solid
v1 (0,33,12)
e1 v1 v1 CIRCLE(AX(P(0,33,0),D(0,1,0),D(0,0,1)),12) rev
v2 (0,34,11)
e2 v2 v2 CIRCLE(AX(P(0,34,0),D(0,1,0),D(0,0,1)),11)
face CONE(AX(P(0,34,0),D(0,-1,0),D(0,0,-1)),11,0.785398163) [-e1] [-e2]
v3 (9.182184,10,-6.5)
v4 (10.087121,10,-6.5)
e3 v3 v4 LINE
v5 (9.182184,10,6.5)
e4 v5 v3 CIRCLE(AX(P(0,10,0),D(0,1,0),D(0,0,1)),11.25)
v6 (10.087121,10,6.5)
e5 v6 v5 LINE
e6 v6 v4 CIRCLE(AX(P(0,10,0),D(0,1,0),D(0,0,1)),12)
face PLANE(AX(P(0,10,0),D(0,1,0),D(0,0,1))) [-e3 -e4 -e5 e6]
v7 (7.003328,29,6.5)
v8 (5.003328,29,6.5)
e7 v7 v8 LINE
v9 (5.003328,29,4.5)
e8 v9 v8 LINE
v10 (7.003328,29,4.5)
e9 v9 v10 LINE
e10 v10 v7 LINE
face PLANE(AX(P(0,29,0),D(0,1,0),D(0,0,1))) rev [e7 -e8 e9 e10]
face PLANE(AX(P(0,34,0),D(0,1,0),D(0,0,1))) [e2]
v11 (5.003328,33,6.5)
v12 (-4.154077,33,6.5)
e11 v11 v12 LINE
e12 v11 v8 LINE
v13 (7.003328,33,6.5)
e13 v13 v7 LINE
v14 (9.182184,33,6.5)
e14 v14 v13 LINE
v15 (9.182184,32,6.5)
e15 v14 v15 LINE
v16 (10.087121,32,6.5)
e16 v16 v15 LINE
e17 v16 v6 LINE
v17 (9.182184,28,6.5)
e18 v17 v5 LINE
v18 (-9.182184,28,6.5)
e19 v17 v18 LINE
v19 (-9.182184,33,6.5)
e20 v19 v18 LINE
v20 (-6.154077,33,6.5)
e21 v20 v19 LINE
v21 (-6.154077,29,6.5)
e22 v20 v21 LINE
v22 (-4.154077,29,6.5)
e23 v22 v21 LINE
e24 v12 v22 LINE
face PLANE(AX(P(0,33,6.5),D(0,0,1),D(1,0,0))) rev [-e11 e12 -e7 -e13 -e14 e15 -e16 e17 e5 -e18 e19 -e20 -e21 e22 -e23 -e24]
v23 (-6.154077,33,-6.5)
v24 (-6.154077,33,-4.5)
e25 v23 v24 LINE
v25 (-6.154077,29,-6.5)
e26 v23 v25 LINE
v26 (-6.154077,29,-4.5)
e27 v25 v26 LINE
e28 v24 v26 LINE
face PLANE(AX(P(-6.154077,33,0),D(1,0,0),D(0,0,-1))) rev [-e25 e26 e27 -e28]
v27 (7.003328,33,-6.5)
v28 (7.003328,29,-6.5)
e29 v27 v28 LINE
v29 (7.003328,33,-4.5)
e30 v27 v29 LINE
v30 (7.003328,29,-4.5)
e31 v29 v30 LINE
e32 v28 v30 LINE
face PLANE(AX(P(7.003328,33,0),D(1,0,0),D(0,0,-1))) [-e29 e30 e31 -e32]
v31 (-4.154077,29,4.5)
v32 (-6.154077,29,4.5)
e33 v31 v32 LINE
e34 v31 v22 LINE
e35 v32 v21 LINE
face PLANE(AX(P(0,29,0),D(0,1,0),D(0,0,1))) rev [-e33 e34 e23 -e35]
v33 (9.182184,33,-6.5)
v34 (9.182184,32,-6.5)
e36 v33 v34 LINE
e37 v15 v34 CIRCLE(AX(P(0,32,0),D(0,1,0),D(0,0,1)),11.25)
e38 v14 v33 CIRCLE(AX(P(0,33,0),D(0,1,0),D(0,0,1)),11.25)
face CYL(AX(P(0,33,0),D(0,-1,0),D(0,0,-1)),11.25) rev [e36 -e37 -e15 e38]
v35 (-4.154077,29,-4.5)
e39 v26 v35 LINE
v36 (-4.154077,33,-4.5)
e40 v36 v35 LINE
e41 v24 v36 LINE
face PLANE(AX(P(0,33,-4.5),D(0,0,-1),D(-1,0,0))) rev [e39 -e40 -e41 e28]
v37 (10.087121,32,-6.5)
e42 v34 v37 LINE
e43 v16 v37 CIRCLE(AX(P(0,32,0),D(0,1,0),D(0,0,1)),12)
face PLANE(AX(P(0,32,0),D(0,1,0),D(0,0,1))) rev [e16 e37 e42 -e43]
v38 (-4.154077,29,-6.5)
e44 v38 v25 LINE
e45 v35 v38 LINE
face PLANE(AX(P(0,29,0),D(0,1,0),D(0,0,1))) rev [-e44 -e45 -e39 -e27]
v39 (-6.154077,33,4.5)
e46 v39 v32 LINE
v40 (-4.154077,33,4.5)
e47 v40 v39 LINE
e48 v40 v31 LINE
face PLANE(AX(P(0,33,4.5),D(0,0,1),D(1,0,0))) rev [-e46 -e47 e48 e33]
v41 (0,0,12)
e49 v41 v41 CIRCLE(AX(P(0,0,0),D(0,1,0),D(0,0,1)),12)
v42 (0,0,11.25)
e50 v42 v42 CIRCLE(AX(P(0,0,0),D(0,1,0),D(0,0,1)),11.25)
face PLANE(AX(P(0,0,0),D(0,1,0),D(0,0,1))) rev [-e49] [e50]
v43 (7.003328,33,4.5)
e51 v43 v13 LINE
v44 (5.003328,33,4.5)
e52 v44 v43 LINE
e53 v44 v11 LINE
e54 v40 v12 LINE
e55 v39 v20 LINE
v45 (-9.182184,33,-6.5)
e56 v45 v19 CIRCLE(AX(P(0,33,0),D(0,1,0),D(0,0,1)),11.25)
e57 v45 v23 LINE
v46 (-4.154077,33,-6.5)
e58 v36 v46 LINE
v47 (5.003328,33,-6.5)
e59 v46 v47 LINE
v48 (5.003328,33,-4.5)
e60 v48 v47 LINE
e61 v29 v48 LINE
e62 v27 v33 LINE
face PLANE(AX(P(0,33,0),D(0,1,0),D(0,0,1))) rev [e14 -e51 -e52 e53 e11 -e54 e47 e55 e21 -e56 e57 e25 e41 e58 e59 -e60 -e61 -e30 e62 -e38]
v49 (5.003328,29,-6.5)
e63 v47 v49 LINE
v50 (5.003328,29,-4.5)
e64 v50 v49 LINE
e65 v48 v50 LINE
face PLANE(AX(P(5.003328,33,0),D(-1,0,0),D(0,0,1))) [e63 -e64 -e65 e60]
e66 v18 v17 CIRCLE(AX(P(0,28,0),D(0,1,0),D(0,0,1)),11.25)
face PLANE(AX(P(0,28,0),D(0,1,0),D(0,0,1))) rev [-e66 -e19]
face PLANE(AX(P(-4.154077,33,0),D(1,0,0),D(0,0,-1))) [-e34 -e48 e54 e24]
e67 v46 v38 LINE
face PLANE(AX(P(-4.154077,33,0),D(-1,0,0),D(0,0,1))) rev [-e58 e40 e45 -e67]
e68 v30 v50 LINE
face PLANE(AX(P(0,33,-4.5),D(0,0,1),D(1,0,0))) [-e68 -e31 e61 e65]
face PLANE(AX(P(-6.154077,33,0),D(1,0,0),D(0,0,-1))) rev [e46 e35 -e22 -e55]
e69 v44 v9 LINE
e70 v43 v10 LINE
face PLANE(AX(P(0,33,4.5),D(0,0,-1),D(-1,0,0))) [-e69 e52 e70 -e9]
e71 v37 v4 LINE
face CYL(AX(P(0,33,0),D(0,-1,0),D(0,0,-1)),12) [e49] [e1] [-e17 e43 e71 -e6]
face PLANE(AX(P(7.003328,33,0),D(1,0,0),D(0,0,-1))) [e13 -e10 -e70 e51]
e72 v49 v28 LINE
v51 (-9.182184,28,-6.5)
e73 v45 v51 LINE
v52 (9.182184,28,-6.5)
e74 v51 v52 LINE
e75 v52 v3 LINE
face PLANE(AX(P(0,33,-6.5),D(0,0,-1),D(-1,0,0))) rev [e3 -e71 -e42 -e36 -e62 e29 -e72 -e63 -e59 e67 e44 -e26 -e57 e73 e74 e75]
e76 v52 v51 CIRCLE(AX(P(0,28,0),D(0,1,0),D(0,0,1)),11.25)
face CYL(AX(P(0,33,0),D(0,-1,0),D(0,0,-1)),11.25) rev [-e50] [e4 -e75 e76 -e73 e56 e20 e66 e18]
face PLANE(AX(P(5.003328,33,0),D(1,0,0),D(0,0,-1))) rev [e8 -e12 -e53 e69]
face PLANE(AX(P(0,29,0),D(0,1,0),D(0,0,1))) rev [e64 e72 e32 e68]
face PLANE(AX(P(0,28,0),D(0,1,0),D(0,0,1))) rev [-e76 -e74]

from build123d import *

# Parameters (mm, degrees)
BOSS_EXTRUDE1_DEPTH = 33
BOSS_EXTRUDE2_START = 32
BOSS_EXTRUDE2_DEPTH = 1
BOSS_EXTRUDE3_START = 33
SKETCH1_7_R         = 12
BOSS_EXTRUDE3_DEPTH = 1
CHAMFER1_SIZE       = 1
BOSS_EXTRUDE4_DEPTH = 10
BOSS_EXTRUDE5_START = 29
SKETCH1_9_W         = 2
SKETCH1_9_H         = 2
BOSS_EXTRUDE5_DEPTH = 4
BOSS_EXTRUDE6_START = 28
BOSS_EXTRUDE6_DEPTH = 5


with BuildPart() as part:
    # Sketch1 → Boss-Extrude1 (new body)
    with BuildSketch(Plane(origin=(0, 0, 0), x_dir=(1, 0, 0), z_dir=(0, 1, 0))):
        with BuildLine():
            ThreePointArc((7.383924434, -9.459263182), (8.859947089, -8.093289663), (10.087120501, -6.5))
            Line((10.087120501, -6.5), (9.182183836, -6.5))
            ThreePointArc((9.182183836, -6.5), (0, -11.25), (-9.182183836, -6.5))
            ThreePointArc((-9.182183836, -6.5), (-11.25, 0), (-9.182183836, 6.5))
            ThreePointArc((-9.182183836, 6.5), (0, 11.25), (9.182183836, 6.5))
            Line((9.182183836, 6.5), (10.087120501, 6.5))
            ThreePointArc((10.087120501, 6.5), (7.6512779, 9.244346732), (4.5, 11.124297731))
            ThreePointArc((4.5, 11.124297731), (0, 12), (-4.5, 11.124297731))
            ThreePointArc((-4.5, 11.124297731), (-10.392304845, 6), (-11.883924434, -1.665034548))
            ThreePointArc((-11.883924434, -1.665034548), (-10.392304845, -6), (-7.383924434, -9.459263182))
            ThreePointArc((-7.383924434, -9.459263182), (0, -12), (7.383924434, -9.459263182))
        make_face()
    extrude(amount=BOSS_EXTRUDE1_DEPTH)



with BuildPart() as body_2:
    # Sketch1<6> → Boss-Extrude2 (new body)
    with BuildSketch(Plane(origin=(0, 0, 0), x_dir=(1, 0, 0), z_dir=(0, 1, 0)).offset(BOSS_EXTRUDE2_START)):
        with BuildLine():
            ThreePointArc((10.087120501, -6.5), (11.248374399, -4.180200161), (11.883924434, -1.665034548))
            ThreePointArc((11.883924434, -1.665034548), (11.970945936, -0.834537834), (12, 0))
            ThreePointArc((12, 0), (11.511851415, 3.387813011), (10.087120501, 6.5))
            Line((10.087120501, 6.5), (9.182183836, 6.5))
            ThreePointArc((9.182183836, 6.5), (10.72058926, 3.410493501), (11.25, 0))
            ThreePointArc((11.25, 0), (10.72058926, -3.410493501), (9.182183836, -6.5))
            Line((9.182183836, -6.5), (10.087120501, -6.5))
        make_face()
    extrude(amount=BOSS_EXTRUDE2_DEPTH)


with BuildPart() as part_1:
    add(part.part)

    add(body_2.part)  # Boss-Extrude3 merges body 2
    # Sketch1<7> → Boss-Extrude3 (add)
    with BuildSketch(Plane(origin=(0, 0, 0), x_dir=(1, 0, 0), z_dir=(0, 1, 0)).offset(BOSS_EXTRUDE3_START)):
        with Locations(Location((0, 0, 0), (0, 0, 32.797168296))):
            Circle(SKETCH1_7_R)
    extrude(amount=BOSS_EXTRUDE3_DEPTH)

    # Chamfer1
    chamfer1_edges = [part_1.edges().sort_by_distance(p)[0] for p in [
        (-10.087120501, 34, 6.5),
    ]]
    chamfer(chamfer1_edges, length=CHAMFER1_SIZE - 0.0001)  # a hair under: the kernel refuses the full size

    # Sketch1<8> → Boss-Extrude4 (add)
    with BuildSketch(Plane(origin=(0, 0, 0), x_dir=(1, 0, 0), z_dir=(0, 1, 0))):
        with BuildLine():
            ThreePointArc((10.087120501, -6.5), (11.248374399, -4.180200161), (11.883924434, -1.665034548))
            ThreePointArc((11.883924434, -1.665034548), (11.970945936, -0.834537834), (12, 0))
            ThreePointArc((12, 0), (11.511851415, 3.387813011), (10.087120501, 6.5))
            Line((10.087120501, 6.5), (9.182183836, 6.5))
            ThreePointArc((9.182183836, 6.5), (10.72058926, 3.410493501), (11.25, 0))
            ThreePointArc((11.25, 0), (10.72058926, -3.410493501), (9.182183836, -6.5))
            Line((9.182183836, -6.5), (10.087120501, -6.5))
        make_face()
        with BuildLine():
            ThreePointArc((7.383924434, -9.459263182), (8.859947089, -8.093289663), (10.087120501, -6.5))
            Line((10.087120501, -6.5), (9.182183836, -6.5))
            ThreePointArc((9.182183836, -6.5), (0, -11.25), (-9.182183836, -6.5))
            ThreePointArc((-9.182183836, -6.5), (-11.25, 0), (-9.182183836, 6.5))
            ThreePointArc((-9.182183836, 6.5), (0, 11.25), (9.182183836, 6.5))
            Line((9.182183836, 6.5), (10.087120501, 6.5))
            ThreePointArc((10.087120501, 6.5), (7.6512779, 9.244346732), (4.5, 11.124297731))
            ThreePointArc((4.5, 11.124297731), (0, 12), (-4.5, 11.124297731))
            ThreePointArc((-4.5, 11.124297731), (-10.392304845, 6), (-11.883924434, -1.665034548))
            ThreePointArc((-11.883924434, -1.665034548), (-10.392304845, -6), (-7.383924434, -9.459263182))
            ThreePointArc((-7.383924434, -9.459263182), (0, -12), (7.383924434, -9.459263182))
        make_face()
    extrude(amount=BOSS_EXTRUDE4_DEPTH)

    # Sketch1<9> → Boss-Extrude5 (add)
    with BuildSketch(Plane(origin=(0, 0, 0), x_dir=(1, 0, 0), z_dir=(0, 1, 0)).offset(BOSS_EXTRUDE5_START)):
        with Locations((-5.154076544, -5.5)):
            Rectangle(SKETCH1_9_W, SKETCH1_9_H)
        with Locations((6.003328083, -5.5)):
            Rectangle(SKETCH1_9_W, SKETCH1_9_H)
        with Locations((6.003328083, 5.5)):
            Rectangle(SKETCH1_9_W, SKETCH1_9_H)
        with Locations((-5.154076544, 5.5)):
            Rectangle(SKETCH1_9_W, SKETCH1_9_H)
    extrude(amount=BOSS_EXTRUDE5_DEPTH)

    # Sketch1<11> → Boss-Extrude6 (add)
    with BuildSketch(Plane(origin=(0, 0, 0), x_dir=(1, 0, 0), z_dir=(0, 1, 0)).offset(BOSS_EXTRUDE6_START)):
        with BuildLine():
            ThreePointArc((-9.182183836, -6.5), (0, -11.25), (9.182183836, -6.5))
            Line((9.182183836, -6.5), (7.003328083, -6.5))
            Line((7.003328083, -6.5), (5.003328083, -6.5))
            Line((5.003328083, -6.5), (0, -6.5))
            Line((0, -6.5), (-4.154076544, -6.5))
            Line((-4.154076544, -6.5), (-6.154076544, -6.5))
            Line((-6.154076544, -6.5), (-9.182183836, -6.5))
        make_face()
        with BuildLine():
            Line((7.003328083, 6.5), (9.182183836, 6.5))
            ThreePointArc((9.182183836, 6.5), (0, 11.25), (-9.182183836, 6.5))
            Line((-9.182183836, 6.5), (-6.154076544, 6.5))
            Line((-6.154076544, 6.5), (-4.154076544, 6.5))
            Line((-4.154076544, 6.5), (0, 6.5))
            Line((0, 6.5), (5.003328083, 6.5))
            Line((5.003328083, 6.5), (7.003328083, 6.5))
        make_face()
    extrude(amount=BOSS_EXTRUDE6_DEPTH)


solid = part_1.part
